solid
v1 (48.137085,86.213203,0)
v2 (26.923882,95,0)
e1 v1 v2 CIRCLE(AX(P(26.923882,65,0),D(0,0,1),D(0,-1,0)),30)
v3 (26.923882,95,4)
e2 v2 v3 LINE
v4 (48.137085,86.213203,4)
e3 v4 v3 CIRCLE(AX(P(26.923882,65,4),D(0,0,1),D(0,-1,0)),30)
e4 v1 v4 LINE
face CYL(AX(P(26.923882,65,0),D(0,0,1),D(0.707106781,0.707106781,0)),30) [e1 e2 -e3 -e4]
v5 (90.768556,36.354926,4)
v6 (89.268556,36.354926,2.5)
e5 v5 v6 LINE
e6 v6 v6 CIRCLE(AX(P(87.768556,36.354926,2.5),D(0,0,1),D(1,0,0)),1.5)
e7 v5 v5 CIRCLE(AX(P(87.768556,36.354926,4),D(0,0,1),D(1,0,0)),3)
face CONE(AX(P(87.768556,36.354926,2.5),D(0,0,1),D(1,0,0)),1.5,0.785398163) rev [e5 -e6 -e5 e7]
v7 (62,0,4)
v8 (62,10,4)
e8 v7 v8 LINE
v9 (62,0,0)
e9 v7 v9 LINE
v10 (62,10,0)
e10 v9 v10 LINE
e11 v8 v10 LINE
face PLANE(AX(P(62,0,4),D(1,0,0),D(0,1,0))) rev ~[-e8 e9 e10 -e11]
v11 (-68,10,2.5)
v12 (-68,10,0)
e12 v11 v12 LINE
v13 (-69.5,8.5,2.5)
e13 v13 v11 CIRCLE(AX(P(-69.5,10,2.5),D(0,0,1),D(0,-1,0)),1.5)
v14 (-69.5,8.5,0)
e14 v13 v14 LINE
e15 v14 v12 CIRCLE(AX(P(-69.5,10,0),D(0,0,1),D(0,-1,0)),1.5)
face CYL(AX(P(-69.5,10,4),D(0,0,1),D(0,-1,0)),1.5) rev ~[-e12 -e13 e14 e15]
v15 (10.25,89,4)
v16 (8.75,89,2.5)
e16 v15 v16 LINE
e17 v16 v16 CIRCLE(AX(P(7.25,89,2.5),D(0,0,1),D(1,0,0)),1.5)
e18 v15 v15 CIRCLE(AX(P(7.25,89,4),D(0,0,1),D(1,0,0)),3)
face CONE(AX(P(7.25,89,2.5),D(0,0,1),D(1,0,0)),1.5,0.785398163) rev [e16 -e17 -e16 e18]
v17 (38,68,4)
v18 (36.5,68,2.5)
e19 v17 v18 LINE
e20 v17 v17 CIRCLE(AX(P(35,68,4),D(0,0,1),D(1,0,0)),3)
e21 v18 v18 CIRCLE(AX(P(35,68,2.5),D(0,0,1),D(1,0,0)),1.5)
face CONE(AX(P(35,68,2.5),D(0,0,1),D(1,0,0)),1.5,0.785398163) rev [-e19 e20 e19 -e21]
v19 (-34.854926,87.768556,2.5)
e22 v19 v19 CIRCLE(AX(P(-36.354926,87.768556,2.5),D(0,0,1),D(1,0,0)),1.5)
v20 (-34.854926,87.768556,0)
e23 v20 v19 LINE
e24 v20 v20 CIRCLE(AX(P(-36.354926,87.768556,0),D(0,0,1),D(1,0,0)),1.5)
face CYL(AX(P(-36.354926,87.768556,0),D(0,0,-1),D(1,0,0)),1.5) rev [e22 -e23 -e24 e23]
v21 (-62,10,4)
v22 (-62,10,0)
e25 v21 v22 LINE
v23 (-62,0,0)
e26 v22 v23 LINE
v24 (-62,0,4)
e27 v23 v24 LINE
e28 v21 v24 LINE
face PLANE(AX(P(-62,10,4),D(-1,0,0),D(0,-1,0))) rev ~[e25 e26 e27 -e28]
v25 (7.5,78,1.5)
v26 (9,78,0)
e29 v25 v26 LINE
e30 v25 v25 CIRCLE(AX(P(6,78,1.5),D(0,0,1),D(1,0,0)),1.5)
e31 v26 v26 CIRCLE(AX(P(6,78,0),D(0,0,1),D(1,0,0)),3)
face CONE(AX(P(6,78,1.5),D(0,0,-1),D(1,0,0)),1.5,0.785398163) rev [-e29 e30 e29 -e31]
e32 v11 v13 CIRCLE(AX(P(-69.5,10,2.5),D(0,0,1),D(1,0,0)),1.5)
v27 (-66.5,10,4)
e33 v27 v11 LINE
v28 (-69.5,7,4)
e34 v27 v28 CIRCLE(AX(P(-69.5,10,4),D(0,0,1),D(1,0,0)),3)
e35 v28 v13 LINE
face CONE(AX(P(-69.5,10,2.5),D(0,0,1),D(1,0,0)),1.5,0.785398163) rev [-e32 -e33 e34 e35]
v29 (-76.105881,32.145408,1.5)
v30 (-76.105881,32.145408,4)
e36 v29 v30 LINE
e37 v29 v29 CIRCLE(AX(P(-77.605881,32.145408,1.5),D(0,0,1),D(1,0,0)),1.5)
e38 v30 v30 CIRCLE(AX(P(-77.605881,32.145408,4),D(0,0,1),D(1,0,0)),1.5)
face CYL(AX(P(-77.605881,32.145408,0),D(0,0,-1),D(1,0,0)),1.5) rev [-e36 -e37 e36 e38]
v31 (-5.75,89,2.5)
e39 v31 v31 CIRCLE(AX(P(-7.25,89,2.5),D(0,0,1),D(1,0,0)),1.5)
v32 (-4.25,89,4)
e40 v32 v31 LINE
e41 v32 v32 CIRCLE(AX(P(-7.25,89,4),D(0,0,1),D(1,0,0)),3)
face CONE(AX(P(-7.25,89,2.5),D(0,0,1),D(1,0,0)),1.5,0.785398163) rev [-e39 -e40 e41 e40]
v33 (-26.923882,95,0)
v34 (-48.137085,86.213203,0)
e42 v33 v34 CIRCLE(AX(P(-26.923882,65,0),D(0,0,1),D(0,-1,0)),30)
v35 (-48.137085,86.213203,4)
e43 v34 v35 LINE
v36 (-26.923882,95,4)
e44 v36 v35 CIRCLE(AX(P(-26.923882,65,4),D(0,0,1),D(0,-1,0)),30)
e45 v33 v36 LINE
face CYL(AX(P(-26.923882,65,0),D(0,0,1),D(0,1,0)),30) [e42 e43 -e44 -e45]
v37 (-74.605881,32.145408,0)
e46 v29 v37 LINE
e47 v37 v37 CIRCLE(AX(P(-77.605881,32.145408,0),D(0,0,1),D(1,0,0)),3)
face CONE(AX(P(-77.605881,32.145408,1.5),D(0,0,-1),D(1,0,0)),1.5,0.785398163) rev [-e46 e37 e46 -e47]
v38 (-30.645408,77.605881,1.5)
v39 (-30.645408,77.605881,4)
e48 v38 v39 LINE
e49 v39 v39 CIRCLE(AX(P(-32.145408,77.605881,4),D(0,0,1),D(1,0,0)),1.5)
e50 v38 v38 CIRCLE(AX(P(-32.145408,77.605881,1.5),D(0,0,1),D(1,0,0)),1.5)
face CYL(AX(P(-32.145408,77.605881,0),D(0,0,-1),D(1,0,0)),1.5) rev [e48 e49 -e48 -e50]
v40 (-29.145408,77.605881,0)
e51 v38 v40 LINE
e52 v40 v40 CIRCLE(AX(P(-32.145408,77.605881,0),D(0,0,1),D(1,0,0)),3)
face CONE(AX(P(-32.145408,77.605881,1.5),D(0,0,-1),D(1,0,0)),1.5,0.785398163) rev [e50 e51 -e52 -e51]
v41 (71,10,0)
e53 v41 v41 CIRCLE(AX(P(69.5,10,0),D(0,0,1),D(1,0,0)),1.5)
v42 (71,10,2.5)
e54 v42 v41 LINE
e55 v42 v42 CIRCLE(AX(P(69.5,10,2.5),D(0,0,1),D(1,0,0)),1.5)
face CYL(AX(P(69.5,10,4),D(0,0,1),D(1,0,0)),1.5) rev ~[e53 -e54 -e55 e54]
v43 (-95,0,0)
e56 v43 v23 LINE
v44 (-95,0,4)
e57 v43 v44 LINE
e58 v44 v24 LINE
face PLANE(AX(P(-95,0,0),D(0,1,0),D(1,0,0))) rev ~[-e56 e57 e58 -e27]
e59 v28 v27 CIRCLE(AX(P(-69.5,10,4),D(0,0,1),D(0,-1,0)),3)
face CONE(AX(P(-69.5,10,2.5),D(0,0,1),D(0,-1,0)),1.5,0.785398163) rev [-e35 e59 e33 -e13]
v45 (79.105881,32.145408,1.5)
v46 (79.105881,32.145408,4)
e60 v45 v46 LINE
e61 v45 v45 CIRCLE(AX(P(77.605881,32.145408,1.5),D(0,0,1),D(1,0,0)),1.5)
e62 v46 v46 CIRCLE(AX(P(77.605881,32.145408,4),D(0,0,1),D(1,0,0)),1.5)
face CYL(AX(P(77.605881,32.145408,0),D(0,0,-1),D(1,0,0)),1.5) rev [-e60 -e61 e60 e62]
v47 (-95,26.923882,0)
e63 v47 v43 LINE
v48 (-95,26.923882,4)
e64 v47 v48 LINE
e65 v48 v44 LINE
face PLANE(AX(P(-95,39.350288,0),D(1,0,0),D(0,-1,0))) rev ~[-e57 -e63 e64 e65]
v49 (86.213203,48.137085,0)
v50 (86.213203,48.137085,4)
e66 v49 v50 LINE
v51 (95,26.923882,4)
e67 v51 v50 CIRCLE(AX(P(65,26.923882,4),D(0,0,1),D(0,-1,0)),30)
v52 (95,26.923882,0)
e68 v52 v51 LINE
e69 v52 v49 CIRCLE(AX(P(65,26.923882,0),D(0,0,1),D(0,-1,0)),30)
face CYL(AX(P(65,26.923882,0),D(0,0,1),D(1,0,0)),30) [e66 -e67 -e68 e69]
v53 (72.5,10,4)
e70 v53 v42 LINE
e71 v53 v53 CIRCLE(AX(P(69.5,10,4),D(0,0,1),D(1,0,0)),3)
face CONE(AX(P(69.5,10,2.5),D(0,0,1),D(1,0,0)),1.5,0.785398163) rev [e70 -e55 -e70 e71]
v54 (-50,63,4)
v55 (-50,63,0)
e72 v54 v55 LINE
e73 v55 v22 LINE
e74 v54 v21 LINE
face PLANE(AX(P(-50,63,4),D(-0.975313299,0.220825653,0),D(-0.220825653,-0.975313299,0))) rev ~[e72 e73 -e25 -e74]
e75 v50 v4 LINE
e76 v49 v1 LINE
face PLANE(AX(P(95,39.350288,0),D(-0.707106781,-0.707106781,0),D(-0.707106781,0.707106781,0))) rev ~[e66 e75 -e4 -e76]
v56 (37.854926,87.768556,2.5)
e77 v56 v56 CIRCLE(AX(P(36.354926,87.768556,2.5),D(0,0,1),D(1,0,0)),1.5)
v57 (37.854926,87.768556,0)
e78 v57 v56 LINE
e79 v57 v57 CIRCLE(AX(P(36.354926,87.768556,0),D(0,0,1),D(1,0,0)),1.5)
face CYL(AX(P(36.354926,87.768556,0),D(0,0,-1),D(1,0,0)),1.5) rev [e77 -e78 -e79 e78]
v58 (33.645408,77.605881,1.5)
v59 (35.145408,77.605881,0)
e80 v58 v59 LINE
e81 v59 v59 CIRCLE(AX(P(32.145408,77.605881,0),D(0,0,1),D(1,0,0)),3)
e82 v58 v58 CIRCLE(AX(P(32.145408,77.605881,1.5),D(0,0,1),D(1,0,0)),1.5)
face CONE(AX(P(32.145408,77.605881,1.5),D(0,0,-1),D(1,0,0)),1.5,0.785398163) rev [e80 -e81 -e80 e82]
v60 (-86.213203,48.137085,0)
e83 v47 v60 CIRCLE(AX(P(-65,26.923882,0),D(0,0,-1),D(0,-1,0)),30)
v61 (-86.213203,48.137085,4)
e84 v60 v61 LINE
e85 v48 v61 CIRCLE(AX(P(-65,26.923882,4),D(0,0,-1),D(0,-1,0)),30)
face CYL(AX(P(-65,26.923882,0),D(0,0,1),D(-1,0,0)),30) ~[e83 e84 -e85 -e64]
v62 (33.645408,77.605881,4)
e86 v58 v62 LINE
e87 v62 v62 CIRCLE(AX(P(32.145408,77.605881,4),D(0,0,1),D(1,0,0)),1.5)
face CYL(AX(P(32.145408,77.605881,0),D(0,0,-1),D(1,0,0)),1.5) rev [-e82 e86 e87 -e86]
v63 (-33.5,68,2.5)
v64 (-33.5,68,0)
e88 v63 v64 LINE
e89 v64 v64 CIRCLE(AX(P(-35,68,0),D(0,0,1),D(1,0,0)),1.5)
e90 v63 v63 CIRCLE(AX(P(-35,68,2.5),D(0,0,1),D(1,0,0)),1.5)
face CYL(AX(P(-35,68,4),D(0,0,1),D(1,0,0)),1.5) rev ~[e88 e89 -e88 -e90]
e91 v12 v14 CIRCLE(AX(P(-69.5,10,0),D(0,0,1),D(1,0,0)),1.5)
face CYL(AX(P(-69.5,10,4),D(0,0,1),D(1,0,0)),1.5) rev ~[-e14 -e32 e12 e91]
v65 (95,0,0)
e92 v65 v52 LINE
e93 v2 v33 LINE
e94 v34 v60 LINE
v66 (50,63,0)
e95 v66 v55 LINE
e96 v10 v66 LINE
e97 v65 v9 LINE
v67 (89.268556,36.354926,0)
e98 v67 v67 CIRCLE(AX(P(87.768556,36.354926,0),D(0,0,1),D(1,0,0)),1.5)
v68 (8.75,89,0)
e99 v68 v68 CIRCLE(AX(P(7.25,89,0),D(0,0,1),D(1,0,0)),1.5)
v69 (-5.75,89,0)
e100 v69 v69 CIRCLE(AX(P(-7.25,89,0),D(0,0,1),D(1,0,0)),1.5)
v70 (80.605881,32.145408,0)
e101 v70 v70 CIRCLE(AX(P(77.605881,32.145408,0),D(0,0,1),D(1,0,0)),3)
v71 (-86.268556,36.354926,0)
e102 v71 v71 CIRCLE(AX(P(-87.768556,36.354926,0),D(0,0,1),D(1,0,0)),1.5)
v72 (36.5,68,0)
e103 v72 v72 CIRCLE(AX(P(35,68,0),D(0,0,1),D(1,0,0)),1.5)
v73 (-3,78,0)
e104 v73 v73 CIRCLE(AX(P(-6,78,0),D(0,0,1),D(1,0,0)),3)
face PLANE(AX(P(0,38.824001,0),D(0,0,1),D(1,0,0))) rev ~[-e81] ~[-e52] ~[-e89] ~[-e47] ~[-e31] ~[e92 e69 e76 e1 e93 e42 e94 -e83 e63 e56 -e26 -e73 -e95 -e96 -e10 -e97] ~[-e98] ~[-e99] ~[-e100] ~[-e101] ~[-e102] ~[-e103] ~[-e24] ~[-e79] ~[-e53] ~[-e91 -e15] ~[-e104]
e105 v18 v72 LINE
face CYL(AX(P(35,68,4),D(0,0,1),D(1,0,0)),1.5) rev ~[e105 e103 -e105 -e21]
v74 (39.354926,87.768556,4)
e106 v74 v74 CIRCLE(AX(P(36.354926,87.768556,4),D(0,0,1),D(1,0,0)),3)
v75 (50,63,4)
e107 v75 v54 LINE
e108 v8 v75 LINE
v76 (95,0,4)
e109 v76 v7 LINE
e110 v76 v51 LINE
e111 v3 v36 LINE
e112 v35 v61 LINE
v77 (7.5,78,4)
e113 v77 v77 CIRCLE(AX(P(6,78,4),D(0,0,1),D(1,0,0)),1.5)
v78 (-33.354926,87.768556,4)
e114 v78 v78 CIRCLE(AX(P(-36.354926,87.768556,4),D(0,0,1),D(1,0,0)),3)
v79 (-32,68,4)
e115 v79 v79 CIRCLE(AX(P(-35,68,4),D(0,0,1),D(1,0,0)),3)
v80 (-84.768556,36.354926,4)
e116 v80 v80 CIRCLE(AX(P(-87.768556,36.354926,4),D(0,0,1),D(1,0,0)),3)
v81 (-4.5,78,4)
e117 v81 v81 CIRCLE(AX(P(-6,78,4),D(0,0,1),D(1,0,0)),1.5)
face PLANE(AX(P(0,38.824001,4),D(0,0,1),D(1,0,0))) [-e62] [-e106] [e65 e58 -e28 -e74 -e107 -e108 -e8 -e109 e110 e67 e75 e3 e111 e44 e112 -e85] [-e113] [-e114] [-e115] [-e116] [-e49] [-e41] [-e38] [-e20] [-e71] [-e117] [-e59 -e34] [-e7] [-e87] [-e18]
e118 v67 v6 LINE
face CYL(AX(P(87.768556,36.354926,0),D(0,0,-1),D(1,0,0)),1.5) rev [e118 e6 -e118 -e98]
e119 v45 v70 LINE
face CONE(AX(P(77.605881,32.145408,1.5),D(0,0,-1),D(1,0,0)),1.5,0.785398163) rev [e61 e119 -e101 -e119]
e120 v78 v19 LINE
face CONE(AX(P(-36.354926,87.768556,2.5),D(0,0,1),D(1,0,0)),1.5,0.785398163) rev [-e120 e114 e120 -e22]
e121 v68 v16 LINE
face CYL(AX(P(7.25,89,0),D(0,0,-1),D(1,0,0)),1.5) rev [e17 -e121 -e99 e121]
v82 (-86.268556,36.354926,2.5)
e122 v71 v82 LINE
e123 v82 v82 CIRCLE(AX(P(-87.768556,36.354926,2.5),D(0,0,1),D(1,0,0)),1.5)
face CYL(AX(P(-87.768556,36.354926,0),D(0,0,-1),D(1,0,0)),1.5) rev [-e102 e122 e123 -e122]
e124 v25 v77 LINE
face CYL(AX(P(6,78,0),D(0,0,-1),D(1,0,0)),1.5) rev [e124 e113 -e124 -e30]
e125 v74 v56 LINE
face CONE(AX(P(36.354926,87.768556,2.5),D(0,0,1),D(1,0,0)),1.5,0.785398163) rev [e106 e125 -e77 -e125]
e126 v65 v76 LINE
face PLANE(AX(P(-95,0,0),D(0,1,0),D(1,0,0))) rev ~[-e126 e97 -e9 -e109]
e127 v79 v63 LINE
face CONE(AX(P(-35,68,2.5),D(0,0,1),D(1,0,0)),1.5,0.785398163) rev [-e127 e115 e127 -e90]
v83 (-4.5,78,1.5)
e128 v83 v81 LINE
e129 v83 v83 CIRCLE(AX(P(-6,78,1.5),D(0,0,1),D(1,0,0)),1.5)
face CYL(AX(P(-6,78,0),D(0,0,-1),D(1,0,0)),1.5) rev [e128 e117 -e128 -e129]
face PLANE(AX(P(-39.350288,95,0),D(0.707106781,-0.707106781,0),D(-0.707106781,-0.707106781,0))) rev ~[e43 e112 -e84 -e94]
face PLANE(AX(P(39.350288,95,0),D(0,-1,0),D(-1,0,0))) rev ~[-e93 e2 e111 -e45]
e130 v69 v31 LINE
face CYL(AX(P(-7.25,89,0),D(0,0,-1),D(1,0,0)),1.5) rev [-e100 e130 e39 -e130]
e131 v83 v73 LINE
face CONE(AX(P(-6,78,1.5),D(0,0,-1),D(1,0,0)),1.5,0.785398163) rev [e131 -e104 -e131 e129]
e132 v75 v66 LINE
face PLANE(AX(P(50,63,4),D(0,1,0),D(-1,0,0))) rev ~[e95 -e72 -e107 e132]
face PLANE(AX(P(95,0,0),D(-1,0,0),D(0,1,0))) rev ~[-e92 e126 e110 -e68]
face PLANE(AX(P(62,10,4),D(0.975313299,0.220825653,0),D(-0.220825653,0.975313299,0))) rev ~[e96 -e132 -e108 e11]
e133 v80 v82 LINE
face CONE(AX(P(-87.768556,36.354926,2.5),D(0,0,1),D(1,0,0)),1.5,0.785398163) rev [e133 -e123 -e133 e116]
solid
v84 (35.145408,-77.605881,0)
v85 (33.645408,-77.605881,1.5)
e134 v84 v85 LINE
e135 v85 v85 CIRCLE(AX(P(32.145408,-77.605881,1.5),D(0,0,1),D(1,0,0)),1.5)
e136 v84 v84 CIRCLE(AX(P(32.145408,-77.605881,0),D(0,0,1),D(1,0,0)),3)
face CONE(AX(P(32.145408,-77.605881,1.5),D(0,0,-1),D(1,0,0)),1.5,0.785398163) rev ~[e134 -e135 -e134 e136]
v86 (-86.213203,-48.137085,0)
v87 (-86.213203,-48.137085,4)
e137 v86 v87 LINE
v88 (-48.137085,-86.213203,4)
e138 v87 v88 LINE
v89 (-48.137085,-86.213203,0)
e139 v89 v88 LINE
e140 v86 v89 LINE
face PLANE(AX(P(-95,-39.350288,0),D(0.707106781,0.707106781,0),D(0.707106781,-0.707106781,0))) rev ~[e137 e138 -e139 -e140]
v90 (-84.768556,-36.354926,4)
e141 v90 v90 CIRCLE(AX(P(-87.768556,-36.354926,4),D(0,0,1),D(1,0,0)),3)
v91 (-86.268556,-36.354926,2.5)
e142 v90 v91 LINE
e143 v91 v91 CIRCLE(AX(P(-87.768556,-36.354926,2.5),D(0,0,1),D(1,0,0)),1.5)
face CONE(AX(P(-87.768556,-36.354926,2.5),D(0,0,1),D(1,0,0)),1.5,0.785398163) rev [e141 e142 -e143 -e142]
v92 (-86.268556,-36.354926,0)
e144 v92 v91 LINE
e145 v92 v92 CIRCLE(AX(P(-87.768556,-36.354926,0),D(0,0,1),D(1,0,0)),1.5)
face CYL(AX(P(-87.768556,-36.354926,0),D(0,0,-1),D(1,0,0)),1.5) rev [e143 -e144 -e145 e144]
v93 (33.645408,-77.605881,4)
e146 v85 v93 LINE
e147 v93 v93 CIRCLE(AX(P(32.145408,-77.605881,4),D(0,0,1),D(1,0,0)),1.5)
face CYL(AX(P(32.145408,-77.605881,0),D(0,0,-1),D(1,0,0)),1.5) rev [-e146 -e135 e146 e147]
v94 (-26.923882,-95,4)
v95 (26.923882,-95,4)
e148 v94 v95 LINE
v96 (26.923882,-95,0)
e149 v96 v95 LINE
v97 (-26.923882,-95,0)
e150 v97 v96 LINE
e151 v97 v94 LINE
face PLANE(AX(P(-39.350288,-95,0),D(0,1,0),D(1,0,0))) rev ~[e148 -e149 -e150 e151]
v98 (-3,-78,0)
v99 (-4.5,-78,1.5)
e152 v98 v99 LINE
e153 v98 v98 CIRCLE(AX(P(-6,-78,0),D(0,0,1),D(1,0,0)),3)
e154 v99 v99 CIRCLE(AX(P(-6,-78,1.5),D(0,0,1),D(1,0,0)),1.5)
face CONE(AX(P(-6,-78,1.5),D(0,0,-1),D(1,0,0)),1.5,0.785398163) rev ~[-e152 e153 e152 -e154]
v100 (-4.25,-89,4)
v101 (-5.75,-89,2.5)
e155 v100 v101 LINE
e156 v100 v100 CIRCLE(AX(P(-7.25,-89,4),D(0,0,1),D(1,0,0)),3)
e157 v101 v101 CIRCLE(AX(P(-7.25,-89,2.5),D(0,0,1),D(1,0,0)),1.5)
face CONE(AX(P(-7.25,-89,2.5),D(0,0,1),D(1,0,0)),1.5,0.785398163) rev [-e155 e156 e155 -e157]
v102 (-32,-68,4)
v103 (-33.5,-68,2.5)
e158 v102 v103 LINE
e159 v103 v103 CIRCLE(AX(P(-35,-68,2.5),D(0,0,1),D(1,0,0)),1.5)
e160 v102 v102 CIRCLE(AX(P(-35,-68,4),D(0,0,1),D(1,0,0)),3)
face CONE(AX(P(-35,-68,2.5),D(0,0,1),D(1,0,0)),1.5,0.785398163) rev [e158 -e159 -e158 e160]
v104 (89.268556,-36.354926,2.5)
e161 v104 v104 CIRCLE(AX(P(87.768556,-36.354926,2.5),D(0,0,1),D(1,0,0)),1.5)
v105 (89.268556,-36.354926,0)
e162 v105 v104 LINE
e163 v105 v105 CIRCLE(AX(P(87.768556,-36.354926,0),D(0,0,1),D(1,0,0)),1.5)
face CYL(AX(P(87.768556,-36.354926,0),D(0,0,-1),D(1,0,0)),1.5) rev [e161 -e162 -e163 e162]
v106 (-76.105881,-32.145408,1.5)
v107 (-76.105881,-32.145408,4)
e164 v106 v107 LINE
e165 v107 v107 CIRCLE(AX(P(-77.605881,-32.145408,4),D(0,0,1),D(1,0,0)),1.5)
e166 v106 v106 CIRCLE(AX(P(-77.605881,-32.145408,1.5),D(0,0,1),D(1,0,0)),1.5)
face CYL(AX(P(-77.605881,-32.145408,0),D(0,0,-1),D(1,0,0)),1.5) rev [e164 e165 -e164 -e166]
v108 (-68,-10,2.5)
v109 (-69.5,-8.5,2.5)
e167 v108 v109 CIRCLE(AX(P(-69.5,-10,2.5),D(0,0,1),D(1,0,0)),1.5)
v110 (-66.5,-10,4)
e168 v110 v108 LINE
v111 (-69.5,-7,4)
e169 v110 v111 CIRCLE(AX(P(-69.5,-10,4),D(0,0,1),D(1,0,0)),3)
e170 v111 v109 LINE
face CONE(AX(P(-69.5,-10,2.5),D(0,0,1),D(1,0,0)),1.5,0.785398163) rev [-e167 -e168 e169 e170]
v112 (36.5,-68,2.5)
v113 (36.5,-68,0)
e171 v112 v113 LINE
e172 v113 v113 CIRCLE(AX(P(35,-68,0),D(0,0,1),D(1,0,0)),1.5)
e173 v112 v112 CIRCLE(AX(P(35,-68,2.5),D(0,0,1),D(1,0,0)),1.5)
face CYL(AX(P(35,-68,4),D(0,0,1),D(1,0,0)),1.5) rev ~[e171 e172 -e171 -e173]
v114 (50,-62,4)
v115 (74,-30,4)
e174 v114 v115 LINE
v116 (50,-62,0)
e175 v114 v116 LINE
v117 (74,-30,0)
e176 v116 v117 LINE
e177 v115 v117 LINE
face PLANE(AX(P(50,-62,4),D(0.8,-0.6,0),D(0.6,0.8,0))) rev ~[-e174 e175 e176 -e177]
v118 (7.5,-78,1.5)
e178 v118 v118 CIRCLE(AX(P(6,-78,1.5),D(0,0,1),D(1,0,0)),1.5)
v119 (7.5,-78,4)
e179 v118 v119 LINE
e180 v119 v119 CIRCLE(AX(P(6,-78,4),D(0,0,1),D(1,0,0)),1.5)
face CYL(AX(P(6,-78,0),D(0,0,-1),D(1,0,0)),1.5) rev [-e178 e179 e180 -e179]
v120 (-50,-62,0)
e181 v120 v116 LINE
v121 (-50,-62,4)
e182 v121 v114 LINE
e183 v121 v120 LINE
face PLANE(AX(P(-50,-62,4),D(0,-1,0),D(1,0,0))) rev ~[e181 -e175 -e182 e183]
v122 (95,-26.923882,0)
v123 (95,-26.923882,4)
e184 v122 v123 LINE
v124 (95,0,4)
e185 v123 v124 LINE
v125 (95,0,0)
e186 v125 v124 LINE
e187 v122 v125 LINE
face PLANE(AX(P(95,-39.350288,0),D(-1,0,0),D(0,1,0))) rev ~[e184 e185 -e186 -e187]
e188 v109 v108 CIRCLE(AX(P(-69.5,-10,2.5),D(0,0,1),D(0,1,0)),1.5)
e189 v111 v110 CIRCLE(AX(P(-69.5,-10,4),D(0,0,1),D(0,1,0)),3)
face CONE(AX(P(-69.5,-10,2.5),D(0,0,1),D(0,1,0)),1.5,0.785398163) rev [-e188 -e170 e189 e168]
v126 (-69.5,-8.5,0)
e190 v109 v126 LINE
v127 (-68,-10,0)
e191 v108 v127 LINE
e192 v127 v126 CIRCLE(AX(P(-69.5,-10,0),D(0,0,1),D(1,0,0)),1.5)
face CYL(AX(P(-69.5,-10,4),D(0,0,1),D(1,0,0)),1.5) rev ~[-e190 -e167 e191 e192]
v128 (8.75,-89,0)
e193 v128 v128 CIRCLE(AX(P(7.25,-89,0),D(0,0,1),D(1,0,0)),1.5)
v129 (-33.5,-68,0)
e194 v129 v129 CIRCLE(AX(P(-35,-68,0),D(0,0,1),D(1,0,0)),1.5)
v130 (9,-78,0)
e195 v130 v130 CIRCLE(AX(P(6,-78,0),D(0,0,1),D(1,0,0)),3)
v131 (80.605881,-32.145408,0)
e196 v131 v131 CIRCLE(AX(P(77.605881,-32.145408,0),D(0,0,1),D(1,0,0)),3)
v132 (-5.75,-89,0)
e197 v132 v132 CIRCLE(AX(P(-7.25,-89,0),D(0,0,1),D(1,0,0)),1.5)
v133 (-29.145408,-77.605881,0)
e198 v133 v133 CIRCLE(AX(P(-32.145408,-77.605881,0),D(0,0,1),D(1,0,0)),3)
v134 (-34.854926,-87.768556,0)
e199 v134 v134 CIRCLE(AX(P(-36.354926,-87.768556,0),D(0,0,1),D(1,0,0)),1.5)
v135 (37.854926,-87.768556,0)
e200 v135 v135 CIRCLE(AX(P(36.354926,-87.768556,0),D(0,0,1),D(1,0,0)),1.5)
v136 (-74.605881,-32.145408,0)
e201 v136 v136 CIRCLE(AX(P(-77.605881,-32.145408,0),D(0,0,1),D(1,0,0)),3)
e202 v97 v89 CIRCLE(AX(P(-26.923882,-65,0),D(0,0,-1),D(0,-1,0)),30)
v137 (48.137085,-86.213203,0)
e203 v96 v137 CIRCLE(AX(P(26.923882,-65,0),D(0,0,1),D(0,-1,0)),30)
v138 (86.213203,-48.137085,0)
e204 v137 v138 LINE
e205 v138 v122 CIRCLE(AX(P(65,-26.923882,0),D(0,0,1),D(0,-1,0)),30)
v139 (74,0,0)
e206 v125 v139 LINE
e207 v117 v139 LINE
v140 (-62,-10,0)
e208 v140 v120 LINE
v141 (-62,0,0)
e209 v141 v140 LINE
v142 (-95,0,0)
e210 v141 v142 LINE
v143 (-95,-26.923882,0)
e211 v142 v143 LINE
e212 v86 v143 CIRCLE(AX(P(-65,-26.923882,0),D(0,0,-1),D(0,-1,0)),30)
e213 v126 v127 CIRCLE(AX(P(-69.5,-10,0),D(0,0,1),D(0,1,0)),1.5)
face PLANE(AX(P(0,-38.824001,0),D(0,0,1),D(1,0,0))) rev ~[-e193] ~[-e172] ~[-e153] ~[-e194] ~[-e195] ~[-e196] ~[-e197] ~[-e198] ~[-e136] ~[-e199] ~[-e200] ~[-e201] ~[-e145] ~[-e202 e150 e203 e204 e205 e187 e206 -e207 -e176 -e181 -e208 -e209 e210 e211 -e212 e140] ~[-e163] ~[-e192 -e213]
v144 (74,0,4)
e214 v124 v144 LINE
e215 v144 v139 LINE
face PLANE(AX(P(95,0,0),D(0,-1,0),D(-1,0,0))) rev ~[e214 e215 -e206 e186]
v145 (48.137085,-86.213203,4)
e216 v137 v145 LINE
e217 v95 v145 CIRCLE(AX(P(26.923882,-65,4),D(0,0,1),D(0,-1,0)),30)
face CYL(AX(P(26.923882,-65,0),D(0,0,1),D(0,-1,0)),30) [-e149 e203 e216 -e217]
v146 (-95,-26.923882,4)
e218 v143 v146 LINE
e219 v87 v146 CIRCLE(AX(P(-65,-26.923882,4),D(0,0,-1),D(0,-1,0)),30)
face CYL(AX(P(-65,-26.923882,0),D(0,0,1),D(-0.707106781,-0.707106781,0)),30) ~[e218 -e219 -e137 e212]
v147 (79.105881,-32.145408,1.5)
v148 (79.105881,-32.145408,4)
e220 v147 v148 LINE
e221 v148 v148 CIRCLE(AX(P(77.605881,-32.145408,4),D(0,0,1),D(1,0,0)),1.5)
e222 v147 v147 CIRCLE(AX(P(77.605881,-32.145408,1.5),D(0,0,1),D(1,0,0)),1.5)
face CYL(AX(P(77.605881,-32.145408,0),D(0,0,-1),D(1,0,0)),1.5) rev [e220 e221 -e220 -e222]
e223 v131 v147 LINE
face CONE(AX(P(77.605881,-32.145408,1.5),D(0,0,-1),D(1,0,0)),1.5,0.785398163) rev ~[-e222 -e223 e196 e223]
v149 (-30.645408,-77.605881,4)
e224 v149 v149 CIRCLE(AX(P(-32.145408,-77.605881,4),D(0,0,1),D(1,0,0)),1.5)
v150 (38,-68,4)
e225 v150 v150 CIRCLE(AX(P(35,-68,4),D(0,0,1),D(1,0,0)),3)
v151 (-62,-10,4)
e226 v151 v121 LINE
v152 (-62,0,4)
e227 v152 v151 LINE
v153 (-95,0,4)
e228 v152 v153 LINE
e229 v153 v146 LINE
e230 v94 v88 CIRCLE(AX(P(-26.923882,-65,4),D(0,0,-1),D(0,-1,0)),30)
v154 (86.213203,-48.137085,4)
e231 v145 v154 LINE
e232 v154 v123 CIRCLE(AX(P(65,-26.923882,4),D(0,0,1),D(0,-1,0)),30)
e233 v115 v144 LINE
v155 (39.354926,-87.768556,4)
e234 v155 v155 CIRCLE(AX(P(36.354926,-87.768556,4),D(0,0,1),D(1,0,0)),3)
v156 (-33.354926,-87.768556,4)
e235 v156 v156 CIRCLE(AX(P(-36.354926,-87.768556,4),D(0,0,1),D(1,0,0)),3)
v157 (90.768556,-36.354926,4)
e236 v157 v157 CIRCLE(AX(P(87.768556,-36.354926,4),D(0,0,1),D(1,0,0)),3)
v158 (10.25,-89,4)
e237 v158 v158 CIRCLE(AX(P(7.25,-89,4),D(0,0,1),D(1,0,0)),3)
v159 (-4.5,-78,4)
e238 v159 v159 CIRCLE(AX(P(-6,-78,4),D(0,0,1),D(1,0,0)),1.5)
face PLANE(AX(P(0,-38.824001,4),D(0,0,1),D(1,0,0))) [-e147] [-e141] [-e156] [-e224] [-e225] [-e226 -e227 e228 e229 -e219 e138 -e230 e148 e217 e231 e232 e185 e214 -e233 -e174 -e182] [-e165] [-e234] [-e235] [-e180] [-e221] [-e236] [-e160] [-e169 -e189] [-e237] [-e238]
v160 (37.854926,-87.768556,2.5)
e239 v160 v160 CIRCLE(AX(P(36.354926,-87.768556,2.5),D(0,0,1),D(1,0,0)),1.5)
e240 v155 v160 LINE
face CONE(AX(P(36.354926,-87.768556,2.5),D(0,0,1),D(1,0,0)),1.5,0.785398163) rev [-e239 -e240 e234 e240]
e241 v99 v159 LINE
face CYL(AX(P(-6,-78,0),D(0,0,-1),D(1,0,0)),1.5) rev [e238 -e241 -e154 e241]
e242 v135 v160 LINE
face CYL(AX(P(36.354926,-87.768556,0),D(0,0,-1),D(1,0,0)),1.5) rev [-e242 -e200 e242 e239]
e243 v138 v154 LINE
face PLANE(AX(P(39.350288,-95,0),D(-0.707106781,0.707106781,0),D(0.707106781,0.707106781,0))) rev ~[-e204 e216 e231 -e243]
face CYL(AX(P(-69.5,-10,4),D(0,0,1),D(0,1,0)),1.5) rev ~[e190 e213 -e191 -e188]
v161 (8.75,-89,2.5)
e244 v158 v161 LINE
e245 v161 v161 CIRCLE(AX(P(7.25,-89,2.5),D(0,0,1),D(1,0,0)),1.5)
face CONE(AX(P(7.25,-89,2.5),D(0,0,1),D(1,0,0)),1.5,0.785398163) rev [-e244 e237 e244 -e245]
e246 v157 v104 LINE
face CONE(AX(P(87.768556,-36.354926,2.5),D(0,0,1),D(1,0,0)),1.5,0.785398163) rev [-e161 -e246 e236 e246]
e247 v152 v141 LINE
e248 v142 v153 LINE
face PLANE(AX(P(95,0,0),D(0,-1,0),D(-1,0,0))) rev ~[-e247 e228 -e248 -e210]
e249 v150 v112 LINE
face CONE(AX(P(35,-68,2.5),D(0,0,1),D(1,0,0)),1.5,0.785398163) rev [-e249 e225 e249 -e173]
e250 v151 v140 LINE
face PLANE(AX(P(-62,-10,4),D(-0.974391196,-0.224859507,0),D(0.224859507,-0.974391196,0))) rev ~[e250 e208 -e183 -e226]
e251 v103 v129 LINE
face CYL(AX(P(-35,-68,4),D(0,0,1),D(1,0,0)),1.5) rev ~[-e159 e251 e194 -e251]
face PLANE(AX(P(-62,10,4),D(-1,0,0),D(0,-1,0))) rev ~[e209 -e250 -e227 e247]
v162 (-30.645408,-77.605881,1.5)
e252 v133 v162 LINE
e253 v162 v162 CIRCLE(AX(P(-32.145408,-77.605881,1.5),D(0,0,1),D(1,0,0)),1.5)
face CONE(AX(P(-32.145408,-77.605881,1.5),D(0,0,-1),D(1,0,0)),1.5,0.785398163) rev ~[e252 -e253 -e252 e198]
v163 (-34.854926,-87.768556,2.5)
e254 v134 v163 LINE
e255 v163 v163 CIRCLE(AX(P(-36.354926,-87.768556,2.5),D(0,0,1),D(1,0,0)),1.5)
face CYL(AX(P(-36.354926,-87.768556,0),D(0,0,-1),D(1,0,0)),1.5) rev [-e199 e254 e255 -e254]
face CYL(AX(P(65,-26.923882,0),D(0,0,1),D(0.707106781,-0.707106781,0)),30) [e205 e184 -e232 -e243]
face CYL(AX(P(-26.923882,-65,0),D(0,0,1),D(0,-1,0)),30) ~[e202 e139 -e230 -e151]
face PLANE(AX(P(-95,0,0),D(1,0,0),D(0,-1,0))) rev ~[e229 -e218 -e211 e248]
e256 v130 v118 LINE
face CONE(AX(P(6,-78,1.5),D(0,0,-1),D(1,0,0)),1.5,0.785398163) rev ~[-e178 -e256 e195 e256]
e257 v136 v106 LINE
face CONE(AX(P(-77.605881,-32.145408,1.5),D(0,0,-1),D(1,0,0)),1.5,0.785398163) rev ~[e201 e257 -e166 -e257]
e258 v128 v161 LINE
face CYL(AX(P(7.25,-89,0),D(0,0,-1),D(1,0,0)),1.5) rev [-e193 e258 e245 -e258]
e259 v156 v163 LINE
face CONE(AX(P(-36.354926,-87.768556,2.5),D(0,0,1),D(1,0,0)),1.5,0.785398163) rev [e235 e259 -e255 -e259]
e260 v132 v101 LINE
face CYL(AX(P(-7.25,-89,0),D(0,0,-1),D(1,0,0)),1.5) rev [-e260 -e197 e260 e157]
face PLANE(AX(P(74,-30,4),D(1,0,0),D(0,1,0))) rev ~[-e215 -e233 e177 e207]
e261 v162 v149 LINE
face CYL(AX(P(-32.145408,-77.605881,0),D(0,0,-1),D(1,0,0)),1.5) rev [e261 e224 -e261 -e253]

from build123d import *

# Parameters (mm, degrees)
F0_R      = 1.5
F1_DEPTH  = 4
F2_DEPTH  = 4
F3_R      = 30
F3_2_R    = 30
F4_R      = 1.5
F5_DEPTH  = 25
F6_R      = 1.5
F7_DEPTH  = 25
F8_SIZE   = 1.5
F8_2_SIZE = 1.5


with BuildPart() as f1:
    # F0 (on Top) → F1 (new body)
    with BuildSketch(Plane.XY):
        Polygon((0, 0), (95, 0), (95, 39.3502884254), (39.3502884254, 95), (-39.3502884254, 95), (-95, 39.3502884254), (-95, 0), align=None)
        with Locations((-77.6058807309, 32.1454083187)):
            Circle(F0_R, mode=Mode.SUBTRACT)
        with Locations((-87.7685555886, 36.3549260747)):
            Circle(F0_R, mode=Mode.SUBTRACT)
        with Locations((-32.1454083187, 77.6058807309)):
            Circle(F0_R, mode=Mode.SUBTRACT)
        with Locations((-36.3549260747, 87.7685555886)):
            Circle(F0_R, mode=Mode.SUBTRACT)
        with Locations((-6, 78)):
            Circle(F0_R, mode=Mode.SUBTRACT)
        with Locations((-7.25, 89)):
            Circle(F0_R, mode=Mode.SUBTRACT)
        with Locations((77.6058807309, 32.1454083187)):
            Circle(F0_R, mode=Mode.SUBTRACT)
        with Locations((87.7685555886, 36.3549260747)):
            Circle(F0_R, mode=Mode.SUBTRACT)
        with Locations((6, 78)):
            Circle(F0_R, mode=Mode.SUBTRACT)
        with Locations((7.25, 89)):
            Circle(F0_R, mode=Mode.SUBTRACT)
        with Locations((32.1454083187, 77.6058807309)):
            Circle(F0_R, mode=Mode.SUBTRACT)
        with Locations((36.3549260747, 87.7685555886)):
            Circle(F0_R, mode=Mode.SUBTRACT)
    extrude(amount=F1_DEPTH)

    # F3
    f3_edges = [f1.edges().sort_by_distance(p)[0] for p in [
        (95, 39.350288, 2),
        (39.350288, 95, 2),
        (-39.350288, 95, 2),
        (-95, 39.350288, 2),
    ]]
    fillet(f3_edges, radius=F3_R)


with BuildPart() as f2:
    # F0 (on Top) → F2 (new body)
    with BuildSketch(Plane.XY):
        Polygon((-39.3502884254, -95), (39.3502884254, -95), (95, -39.3502884254), (95, 0), (0, 0), (-95, 0), (-95, -39.3502884254), align=None)
        with Locations((-36.3549260747, -87.7685555886)):
            Circle(F0_R, mode=Mode.SUBTRACT)
        with Locations((-32.1454083187, -77.6058807309)):
            Circle(F0_R, mode=Mode.SUBTRACT)
        with Locations((-7.25, -89)):
            Circle(F0_R, mode=Mode.SUBTRACT)
        with Locations((-6, -78)):
            Circle(F0_R, mode=Mode.SUBTRACT)
        with Locations((-87.7685555886, -36.3549260747)):
            Circle(F0_R, mode=Mode.SUBTRACT)
        with Locations((-77.6058807309, -32.1454083187)):
            Circle(F0_R, mode=Mode.SUBTRACT)
        with Locations((7.25, -89)):
            Circle(F0_R, mode=Mode.SUBTRACT)
        with Locations((6, -78)):
            Circle(F0_R, mode=Mode.SUBTRACT)
        with Locations((36.3549260747, -87.7685555886)):
            Circle(F0_R, mode=Mode.SUBTRACT)
        with Locations((32.1454083187, -77.6058807309)):
            Circle(F0_R, mode=Mode.SUBTRACT)
        with Locations((87.7685555886, -36.3549260747)):
            Circle(F0_R, mode=Mode.SUBTRACT)
        with Locations((77.6058807309, -32.1454083187)):
            Circle(F0_R, mode=Mode.SUBTRACT)
    extrude(amount=F2_DEPTH)

    # F3#2
    f3_2_edges = [f2.edges().sort_by_distance(p)[0] for p in [
        (-95, -39.350288, 2),
        (95, -39.350288, 2),
        (-39.350288, -95, 2),
        (39.350288, -95, 2),
    ]]
    fillet(f3_2_edges, radius=F3_2_R)


with BuildPart() as f5_tool:
    # F4 (on face) → F5 (new body)
    with BuildSketch(Plane.XY.offset(4)):
        with Locations((-35, 68)):
            Circle(F4_R)
        with Locations((35, 68)):
            Circle(F4_R)
        with Locations((35, -68)):
            Circle(F4_R)
        with Locations((-35, -68)):
            Circle(F4_R)
    extrude(amount=-F5_DEPTH)


with BuildPart() as f1_1:
    add(f1.part)

    # F5: cut by f5_tool
    add(f5_tool.part, mode=Mode.SUBTRACT)


with BuildPart() as f2_1:
    add(f2.part)

    # F5: cut by f5_tool
    add(f5_tool.part, mode=Mode.SUBTRACT)


with BuildPart() as f7_tool:
    # F6 (on face) → F7 (new body)
    with BuildSketch(Plane.XY.offset(4)):
        with BuildLine():
            ThreePointArc((-68, 10), (-70.5606601718, 11.0606601718), (-69.5, 8.5))
            ThreePointArc((-69.5, 8.5), (-68.4393398282, 8.9393398282), (-68, 10))
        make_face()
        Polygon((0, 63), (-50, 63), (-50, 0), (0, 0), (50, 0), (50, 63), align=None)
        Polygon((-50, 0), (-50, 63), (-62, 10), (-62, 0), align=None)
        Polygon((0, 0), (-50, 0), (-50, -62), (50, -62), (50, 0), align=None)
        Polygon((-50, -62), (-50, 0), (-62, 0), (-62, -10), align=None)
        Polygon((62, 10), (50, 63), (50, 0), (62, 0), align=None)
        with BuildLine():
            ThreePointArc((-68, -10), (-68.4393398282, -8.9393398282), (-69.5, -8.5))
            ThreePointArc((-69.5, -8.5), (-70.5606601718, -11.0606601718), (-68, -10))
        make_face()
        Polygon((62, 0), (50, 0), (50, -62), (74, -30), (74, 0), align=None)
        with Locations((69.5, -10)):
            Circle(F6_R, mode=Mode.SUBTRACT)
        with Locations((69.5, 10)):
            Circle(F6_R)
        with Locations((69.5, -10)):
            Circle(F6_R)
    extrude(amount=-F7_DEPTH)


with BuildPart() as f1_2:
    add(f1_1.part)

    # F7: cut by f7_tool
    add(f7_tool.part, mode=Mode.SUBTRACT)

    # F8
    f8_edges = [f1_2.edges().sort_by_distance(p)[0] for p in [
        (-36.5, 68, 4),
        (33.5, 68, 4),
        (-89.268556, 36.354926, 4),
        (-37.854926, 87.768556, 4),
        (-8.75, 89, 4),
        (5.75, 89, 4),
        (34.854926, 87.768556, 4),
        (86.268556, 36.354926, 4),
        (-79.105881, 32.145408, 0),
        (76.105881, 32.145408, 0),
        (30.645408, 77.605881, 0),
        (4.5, 78, 0),
        (-7.5, 78, 0),
        (-33.645408, 77.605881, 0),
        (-69.5, 11.5, 4),
        (68, 10, 4),
    ]]
    chamfer(f8_edges, length=F8_SIZE)


with BuildPart() as f2_2:
    add(f2_1.part)

    # F7: cut by f7_tool
    add(f7_tool.part, mode=Mode.SUBTRACT)

    # F8#2
    f8_2_edges = [f2_2.edges().sort_by_distance(p)[0] for p in [
        (-36.5, -68, 4),
        (33.5, -68, 4),
        (34.854926, -87.768556, 4),
        (5.75, -89, 4),
        (-8.75, -89, 4),
        (-37.854926, -87.768556, 4),
        (-89.268556, -36.354926, 4),
        (86.268556, -36.354926, 4),
        (-79.105881, -32.145408, 0),
        (-33.645408, -77.605881, 0),
        (-7.5, -78, 0),
        (4.5, -78, 0),
        (30.645408, -77.605881, 0),
        (76.105881, -32.145408, 0),
        (-71, -10, 4),
    ]]
    chamfer(f8_2_edges, length=F8_2_SIZE)


solid = Compound([f1_2.part, f2_2.part])
